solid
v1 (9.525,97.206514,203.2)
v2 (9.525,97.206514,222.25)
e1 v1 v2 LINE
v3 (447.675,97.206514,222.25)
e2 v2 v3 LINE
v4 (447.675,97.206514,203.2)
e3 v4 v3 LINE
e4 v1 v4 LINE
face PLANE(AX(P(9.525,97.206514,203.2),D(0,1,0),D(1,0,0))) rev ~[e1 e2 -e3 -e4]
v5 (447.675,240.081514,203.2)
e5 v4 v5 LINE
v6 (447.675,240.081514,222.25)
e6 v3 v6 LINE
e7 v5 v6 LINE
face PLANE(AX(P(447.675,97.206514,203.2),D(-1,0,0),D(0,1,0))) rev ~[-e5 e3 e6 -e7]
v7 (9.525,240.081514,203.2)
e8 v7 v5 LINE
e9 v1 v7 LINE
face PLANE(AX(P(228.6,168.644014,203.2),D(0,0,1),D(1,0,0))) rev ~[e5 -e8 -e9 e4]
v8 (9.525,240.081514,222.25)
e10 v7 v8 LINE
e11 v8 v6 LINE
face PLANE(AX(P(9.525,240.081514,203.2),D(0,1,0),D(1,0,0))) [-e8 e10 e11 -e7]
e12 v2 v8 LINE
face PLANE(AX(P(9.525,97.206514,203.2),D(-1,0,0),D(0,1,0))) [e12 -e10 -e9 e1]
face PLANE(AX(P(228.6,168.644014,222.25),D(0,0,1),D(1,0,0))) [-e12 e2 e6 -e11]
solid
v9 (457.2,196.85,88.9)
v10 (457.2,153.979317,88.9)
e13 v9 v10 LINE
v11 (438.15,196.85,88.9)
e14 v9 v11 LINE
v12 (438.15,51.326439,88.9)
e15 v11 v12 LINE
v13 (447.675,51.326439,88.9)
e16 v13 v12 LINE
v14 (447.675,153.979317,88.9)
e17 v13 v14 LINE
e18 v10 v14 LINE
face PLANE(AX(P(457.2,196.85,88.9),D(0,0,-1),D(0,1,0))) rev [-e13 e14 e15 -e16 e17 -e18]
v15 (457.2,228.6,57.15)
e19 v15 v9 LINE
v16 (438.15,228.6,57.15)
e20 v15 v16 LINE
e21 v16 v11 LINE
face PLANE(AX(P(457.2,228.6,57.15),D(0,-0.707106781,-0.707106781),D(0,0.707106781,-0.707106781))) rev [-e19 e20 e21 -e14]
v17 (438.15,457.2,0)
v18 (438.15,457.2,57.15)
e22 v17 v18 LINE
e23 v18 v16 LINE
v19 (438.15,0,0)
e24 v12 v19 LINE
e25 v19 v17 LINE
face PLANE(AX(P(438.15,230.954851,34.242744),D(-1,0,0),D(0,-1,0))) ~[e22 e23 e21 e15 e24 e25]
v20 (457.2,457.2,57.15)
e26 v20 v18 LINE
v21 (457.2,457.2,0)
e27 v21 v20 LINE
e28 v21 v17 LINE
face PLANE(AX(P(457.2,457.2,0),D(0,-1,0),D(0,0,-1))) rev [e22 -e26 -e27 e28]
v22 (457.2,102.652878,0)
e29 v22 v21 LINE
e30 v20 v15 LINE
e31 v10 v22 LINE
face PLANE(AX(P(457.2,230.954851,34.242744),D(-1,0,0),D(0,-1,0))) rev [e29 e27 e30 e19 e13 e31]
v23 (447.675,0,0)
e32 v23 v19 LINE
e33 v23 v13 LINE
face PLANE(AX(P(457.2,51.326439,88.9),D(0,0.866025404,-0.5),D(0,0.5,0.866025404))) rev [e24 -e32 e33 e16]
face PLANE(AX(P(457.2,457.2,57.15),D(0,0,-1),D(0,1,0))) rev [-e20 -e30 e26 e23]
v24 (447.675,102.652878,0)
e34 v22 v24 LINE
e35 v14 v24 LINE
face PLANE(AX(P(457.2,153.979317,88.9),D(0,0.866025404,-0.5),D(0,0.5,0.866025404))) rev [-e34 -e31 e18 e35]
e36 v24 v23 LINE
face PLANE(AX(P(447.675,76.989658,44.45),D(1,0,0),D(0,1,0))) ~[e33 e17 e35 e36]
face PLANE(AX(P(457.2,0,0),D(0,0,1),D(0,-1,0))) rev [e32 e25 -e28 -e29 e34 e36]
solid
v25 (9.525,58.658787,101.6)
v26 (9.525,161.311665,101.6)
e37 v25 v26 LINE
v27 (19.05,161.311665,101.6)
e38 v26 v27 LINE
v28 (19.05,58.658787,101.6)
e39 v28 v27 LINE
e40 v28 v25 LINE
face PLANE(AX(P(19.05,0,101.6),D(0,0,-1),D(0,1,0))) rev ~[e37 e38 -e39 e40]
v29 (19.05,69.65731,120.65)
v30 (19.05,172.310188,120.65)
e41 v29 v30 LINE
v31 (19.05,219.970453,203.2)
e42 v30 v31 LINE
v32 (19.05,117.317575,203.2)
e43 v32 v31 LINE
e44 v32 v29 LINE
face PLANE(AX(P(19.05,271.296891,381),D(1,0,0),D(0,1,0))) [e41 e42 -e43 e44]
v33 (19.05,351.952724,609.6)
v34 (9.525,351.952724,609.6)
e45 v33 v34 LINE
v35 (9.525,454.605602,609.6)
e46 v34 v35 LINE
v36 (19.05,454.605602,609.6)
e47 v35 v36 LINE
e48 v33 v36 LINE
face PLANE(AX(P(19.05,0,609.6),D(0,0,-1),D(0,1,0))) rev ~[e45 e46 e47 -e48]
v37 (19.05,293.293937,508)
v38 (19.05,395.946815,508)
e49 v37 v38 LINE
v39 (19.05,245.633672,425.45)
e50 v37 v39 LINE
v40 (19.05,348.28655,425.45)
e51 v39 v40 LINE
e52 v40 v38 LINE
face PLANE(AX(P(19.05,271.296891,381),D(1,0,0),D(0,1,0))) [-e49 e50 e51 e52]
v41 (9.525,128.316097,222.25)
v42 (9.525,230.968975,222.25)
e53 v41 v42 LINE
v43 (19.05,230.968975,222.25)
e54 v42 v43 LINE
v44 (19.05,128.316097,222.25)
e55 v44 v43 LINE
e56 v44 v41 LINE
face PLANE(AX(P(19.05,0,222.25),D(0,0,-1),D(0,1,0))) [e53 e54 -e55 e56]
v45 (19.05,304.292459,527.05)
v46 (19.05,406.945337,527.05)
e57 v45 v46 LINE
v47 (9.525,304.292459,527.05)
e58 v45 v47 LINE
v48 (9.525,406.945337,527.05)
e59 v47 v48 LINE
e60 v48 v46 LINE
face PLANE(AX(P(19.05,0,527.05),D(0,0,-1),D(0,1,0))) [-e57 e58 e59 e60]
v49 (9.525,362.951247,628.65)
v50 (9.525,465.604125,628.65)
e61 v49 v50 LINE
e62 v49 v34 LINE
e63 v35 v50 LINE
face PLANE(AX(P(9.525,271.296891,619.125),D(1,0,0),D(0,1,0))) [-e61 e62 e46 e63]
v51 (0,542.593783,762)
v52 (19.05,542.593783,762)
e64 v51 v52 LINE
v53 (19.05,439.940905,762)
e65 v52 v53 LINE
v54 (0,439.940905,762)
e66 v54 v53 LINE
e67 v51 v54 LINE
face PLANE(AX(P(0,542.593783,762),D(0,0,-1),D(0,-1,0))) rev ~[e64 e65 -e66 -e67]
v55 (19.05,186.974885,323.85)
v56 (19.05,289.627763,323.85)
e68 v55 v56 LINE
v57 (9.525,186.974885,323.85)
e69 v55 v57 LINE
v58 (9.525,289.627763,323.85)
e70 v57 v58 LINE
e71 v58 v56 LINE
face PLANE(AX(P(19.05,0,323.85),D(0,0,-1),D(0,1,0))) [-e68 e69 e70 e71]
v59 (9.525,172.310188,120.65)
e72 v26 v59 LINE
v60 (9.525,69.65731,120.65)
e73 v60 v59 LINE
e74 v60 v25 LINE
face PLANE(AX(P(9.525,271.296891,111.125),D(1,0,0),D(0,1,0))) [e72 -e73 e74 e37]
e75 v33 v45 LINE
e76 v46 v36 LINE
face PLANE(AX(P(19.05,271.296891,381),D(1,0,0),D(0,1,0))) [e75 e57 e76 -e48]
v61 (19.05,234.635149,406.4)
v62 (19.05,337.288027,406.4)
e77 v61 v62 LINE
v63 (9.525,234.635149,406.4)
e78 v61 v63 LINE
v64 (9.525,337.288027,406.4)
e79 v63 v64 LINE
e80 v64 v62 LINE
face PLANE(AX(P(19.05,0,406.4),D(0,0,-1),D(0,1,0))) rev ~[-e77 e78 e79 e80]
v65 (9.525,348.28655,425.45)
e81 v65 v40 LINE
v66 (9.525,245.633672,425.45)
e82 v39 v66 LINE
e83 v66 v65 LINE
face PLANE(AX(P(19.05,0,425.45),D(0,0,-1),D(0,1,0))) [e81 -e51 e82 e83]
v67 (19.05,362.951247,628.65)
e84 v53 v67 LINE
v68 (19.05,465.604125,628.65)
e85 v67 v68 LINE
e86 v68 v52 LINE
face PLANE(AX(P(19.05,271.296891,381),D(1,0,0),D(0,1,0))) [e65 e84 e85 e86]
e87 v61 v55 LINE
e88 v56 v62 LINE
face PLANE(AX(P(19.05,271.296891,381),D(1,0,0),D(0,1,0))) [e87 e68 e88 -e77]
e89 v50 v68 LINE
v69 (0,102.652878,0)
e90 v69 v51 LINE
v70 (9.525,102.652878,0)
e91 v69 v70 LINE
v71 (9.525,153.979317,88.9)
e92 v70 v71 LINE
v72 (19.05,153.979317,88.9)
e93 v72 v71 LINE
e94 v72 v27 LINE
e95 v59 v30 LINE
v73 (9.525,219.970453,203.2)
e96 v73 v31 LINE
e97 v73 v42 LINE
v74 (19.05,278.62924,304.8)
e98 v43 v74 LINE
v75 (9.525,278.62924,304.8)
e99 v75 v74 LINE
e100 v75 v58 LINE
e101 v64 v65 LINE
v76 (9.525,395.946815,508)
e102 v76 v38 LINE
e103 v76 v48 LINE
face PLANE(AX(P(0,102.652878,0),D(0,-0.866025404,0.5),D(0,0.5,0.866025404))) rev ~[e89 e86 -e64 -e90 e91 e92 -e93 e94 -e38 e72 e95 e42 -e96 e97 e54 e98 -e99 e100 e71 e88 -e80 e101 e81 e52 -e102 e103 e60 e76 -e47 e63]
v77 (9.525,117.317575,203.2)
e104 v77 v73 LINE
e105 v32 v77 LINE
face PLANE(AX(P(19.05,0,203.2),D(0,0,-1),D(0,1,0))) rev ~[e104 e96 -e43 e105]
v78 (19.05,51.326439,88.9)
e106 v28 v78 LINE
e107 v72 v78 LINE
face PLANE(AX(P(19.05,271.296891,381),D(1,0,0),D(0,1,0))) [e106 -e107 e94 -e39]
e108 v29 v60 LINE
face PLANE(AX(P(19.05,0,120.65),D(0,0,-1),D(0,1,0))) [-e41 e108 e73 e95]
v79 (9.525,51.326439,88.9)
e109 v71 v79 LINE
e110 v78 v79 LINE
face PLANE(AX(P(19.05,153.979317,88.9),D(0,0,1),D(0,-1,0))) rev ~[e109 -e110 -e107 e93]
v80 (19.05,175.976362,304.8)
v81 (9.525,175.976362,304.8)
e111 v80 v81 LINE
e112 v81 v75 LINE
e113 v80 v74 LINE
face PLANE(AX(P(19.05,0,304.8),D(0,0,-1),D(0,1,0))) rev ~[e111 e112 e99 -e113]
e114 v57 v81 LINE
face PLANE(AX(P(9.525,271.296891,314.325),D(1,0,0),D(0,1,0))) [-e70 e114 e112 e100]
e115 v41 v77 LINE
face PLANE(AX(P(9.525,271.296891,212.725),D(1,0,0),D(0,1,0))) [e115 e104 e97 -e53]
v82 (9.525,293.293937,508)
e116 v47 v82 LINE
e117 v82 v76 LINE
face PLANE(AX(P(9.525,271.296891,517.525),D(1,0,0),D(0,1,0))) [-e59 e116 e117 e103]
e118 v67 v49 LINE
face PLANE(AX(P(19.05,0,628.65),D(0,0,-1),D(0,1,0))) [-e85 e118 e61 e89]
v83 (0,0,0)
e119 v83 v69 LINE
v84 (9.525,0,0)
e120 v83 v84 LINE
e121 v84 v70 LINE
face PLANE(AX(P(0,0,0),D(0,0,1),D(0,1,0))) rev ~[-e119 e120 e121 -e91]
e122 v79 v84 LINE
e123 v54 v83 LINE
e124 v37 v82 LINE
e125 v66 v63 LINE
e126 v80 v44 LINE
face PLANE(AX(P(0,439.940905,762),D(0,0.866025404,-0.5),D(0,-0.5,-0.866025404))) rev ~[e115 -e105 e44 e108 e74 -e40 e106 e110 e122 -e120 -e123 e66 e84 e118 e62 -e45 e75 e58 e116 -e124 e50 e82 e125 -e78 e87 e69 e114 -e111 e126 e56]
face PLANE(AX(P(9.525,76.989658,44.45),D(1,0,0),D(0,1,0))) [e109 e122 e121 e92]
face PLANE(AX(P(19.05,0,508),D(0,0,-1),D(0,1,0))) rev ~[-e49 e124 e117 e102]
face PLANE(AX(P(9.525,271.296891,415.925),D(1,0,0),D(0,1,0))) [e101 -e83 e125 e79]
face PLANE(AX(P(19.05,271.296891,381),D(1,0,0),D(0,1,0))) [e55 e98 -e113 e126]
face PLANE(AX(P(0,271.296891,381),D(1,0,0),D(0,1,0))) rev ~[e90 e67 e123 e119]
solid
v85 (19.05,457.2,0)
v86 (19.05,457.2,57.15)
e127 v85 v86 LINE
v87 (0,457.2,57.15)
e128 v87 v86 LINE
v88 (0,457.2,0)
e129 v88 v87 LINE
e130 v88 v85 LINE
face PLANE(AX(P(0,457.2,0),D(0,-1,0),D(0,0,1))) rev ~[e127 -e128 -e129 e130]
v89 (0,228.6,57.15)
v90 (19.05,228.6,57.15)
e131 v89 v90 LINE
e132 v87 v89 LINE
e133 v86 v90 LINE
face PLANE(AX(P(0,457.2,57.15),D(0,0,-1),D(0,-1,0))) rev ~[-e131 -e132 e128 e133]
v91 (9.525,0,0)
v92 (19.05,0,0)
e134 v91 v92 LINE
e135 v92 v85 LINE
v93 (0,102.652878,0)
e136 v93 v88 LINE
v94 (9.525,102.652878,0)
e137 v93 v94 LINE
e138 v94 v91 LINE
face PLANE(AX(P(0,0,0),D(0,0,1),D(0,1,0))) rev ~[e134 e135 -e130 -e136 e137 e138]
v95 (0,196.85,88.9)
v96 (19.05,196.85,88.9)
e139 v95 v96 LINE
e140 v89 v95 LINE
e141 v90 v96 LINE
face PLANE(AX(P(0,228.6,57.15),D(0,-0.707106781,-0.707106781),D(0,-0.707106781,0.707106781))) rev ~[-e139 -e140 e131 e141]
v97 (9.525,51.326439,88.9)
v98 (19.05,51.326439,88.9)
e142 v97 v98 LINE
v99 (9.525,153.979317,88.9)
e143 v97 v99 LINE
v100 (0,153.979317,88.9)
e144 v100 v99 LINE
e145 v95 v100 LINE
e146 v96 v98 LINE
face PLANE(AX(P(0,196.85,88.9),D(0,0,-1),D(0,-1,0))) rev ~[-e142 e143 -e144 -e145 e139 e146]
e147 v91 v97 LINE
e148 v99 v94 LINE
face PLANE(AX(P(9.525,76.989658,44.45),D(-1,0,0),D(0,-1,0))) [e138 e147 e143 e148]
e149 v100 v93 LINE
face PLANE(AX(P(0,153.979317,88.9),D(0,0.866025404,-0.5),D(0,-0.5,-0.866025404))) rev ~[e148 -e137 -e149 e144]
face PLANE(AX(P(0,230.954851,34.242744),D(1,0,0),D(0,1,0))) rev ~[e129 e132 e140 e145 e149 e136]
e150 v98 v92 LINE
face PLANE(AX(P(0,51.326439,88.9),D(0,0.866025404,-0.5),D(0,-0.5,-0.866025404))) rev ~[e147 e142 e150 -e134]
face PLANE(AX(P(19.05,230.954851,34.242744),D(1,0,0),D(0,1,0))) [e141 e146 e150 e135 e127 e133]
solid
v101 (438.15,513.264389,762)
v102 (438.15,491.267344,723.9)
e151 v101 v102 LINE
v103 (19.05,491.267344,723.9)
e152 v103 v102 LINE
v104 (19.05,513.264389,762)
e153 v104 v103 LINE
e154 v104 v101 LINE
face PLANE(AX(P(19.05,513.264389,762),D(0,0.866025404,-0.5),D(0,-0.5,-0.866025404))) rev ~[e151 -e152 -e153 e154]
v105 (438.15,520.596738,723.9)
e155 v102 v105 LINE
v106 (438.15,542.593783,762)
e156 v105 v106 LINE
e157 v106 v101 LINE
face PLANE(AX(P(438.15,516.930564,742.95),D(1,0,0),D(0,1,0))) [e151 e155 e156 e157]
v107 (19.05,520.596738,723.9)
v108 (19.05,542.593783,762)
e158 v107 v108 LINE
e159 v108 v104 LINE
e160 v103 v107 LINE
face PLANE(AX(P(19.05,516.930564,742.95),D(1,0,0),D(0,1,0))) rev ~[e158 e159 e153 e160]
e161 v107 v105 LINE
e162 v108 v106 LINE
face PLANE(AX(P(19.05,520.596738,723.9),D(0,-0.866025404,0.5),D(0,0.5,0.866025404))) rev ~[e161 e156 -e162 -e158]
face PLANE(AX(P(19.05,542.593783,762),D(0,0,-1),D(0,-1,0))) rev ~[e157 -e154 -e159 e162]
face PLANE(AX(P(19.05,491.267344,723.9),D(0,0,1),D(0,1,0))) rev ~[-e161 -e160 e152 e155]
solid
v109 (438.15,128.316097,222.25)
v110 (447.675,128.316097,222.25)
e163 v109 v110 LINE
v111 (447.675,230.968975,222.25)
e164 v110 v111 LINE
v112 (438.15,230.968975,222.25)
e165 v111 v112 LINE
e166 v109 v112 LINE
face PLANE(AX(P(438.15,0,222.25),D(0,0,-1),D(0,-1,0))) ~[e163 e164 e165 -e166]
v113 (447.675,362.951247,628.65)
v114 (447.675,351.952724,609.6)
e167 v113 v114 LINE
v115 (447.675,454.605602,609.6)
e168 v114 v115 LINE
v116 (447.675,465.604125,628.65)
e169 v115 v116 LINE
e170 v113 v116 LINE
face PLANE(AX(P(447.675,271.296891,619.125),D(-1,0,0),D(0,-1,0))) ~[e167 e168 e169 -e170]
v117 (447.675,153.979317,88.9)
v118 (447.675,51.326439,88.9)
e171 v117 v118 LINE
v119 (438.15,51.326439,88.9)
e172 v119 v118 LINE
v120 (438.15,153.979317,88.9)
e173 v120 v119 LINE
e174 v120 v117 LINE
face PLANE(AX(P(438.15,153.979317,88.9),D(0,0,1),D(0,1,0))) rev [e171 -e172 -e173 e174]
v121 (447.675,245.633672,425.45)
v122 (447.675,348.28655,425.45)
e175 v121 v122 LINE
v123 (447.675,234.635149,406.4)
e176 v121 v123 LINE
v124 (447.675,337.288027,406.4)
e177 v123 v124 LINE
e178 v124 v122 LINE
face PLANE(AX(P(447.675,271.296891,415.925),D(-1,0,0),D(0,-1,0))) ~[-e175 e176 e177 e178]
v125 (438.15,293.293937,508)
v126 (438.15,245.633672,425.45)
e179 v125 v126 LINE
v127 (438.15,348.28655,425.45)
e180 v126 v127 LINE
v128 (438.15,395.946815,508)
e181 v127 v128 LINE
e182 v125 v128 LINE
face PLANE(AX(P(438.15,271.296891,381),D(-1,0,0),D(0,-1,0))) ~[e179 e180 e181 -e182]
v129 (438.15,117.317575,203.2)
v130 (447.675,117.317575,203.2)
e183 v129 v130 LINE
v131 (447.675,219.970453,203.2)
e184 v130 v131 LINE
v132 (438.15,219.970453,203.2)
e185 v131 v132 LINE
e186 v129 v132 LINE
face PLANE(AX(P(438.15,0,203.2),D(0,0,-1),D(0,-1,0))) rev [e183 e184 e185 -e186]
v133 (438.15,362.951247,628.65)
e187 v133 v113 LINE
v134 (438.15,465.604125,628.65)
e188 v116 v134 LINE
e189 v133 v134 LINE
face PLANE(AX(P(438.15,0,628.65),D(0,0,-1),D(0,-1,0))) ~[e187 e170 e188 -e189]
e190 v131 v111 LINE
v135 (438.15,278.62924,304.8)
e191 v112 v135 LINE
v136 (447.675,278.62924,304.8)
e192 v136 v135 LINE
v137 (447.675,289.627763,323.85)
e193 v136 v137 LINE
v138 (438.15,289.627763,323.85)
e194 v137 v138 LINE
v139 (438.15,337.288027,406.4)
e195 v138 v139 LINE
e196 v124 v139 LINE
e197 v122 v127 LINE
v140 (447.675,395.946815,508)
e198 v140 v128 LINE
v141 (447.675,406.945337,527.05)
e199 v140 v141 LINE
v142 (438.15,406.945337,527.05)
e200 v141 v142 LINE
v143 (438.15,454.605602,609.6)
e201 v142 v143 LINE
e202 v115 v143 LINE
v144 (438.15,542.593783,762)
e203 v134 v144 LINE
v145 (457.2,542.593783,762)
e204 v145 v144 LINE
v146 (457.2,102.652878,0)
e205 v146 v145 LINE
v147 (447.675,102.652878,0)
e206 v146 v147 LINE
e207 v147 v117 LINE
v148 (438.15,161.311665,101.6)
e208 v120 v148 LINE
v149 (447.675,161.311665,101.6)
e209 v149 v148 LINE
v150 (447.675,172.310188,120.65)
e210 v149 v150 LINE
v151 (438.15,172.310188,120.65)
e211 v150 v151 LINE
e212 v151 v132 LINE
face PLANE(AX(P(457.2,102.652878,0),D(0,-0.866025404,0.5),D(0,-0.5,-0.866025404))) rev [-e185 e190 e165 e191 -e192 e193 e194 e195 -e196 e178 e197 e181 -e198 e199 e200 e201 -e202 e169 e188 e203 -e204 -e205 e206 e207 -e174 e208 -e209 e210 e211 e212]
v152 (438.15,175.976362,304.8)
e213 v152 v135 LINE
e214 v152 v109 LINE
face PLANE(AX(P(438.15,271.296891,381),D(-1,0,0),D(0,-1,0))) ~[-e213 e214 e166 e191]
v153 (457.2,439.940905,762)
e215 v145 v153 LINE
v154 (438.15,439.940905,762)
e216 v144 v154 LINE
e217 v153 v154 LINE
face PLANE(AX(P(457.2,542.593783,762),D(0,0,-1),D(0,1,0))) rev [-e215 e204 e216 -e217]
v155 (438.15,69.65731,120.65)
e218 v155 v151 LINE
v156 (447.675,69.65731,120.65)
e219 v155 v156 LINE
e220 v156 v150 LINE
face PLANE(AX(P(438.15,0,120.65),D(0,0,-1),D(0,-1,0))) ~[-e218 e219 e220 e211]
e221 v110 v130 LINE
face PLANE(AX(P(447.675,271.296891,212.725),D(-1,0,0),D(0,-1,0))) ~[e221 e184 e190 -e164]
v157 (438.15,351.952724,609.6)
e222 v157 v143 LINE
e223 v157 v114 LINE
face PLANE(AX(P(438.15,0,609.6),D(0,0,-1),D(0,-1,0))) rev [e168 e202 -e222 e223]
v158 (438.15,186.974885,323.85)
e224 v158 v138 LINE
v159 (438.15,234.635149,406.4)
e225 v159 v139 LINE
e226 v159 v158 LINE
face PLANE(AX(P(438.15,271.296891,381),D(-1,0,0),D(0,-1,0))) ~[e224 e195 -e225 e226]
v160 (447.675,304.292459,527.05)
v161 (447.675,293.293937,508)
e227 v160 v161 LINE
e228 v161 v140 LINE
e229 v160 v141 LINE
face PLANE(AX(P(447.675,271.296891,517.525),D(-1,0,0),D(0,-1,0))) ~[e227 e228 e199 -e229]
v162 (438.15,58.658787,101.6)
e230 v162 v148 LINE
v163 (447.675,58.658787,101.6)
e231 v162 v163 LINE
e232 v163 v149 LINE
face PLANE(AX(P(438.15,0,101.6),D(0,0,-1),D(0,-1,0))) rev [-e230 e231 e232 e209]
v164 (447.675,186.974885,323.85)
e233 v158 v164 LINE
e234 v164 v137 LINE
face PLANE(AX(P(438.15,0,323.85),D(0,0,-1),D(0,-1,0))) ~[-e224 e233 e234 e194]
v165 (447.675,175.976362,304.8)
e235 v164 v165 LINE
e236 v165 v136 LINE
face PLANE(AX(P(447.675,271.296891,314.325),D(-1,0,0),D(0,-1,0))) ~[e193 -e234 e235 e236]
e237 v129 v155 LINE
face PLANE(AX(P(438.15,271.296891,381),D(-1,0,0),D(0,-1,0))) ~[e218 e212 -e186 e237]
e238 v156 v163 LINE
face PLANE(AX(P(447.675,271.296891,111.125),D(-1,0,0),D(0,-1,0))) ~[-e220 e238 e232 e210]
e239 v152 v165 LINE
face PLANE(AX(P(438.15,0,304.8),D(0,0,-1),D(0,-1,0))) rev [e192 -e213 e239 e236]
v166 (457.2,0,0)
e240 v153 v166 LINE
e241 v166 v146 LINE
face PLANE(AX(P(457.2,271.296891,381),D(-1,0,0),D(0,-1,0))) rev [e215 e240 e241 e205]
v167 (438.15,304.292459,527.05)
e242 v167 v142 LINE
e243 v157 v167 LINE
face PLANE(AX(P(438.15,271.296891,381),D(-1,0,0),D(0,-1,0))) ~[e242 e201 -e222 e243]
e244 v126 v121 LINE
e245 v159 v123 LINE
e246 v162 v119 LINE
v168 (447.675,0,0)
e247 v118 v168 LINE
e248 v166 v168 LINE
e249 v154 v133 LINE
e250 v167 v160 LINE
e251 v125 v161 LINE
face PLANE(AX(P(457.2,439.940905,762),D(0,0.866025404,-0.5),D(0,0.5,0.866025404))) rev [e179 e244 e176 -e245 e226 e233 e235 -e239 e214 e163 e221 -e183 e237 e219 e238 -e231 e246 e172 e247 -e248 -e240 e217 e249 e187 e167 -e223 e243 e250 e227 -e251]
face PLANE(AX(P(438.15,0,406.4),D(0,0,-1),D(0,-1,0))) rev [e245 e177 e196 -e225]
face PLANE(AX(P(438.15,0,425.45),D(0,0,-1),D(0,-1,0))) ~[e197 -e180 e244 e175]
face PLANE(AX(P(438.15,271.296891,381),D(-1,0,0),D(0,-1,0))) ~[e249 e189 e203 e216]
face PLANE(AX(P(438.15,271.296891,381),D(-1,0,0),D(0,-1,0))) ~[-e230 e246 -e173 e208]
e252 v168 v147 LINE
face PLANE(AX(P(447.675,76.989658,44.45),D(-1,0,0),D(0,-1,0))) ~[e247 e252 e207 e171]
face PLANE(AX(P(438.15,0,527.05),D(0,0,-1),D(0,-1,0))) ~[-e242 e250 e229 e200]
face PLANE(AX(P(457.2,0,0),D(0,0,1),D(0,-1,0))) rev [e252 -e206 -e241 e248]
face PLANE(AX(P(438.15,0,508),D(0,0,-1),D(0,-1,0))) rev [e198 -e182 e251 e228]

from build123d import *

# Parameters (mm, degrees)
F1_DEPTH  = 19.05
F3_DEPTH  = 9.525
F5_DEPTH  = 19.05
F7_DEPTH  = 9.525
F8_W      = 542.5937829844
F8_H      = 19.05
F9_DEPTH  = 9.525
F12_W     = 438.15
F12_H     = 142.875
F13_DEPTH = 19.05
F15_DEPTH = 419.1


# Not quite as in the source:
# - a length typed as a fraction of an inch, garbled in the dataset ("3 / 203.2 mm" for 3/8 in), is restored


with BuildPart() as f1:
    # F0 (on Right) → F1 (new body)
    with BuildSketch(Plane.YZ):
        Polygon((439.9409051225, 762), (0, 0), (102.6528778619, 0), (542.5937829844, 762), align=None)
    extrude(amount=F1_DEPTH)

    # F2 (on face) → F3 (cut)
    with BuildSketch(Plane.YZ.offset(19.05)):
        Polygon((51.326438931, 88.9), (0, 0), (102.6528778619, 0), (153.9793167929, 88.9), align=None)
    extrude(amount=-F3_DEPTH, mode=Mode.SUBTRACT)

    # F8 (on face) → F9 (cut)
    with BuildSketch(Plane.YZ.offset(19.05)):
        with Locations((271.2968914922, 111.125)):
            Rectangle(F8_W, F8_H)
        with Locations((271.2968914922, 212.725)):
            Rectangle(F8_W, F8_H)
        with Locations((271.2968914922, 314.325)):
            Rectangle(F8_W, F8_H)
        with Locations((271.2968914922, 415.925)):
            Rectangle(F8_W, F8_H)
        with Locations((271.2968914922, 517.525)):
            Rectangle(F8_W, F8_H)
        with Locations((271.2968914922, 619.125)):
            Rectangle(F8_W, F8_H)
    extrude(amount=-F9_DEPTH, mode=Mode.SUBTRACT)


with BuildPart() as f5:
    # F4 (on Right) → F5 (new body)
    with BuildSketch(Plane.YZ):
        Polygon((51.326438931, 88.9), (0, 0), (457.2, 0), (457.2, 57.15), (228.6, 57.15), (196.85, 88.9), align=None)
    extrude(amount=F5_DEPTH)

    # F6 (on face) → F7 (cut)
    with BuildSketch(Plane(origin=(0, 0, 0), x_dir=(0, -1, 0), z_dir=(-1, 0, 0))):
        Polygon((0, 0), (-51.326438931, 88.9), (-153.9793167929, 88.9), (-102.6528778619, 0), align=None)
    extrude(amount=-F7_DEPTH, mode=Mode.SUBTRACT)


with BuildPart() as f11_1:
    # F11: instance of F1
    add(f1.part.mirror(Plane.YZ.offset(228.6)))


with BuildPart() as f11_2:
    # F11: instance of F5
    add(f5.part.mirror(Plane.YZ.offset(228.6)))


with BuildPart() as f13:
    # F12 (on face) → F13 (new body)
    with BuildSketch(Plane.XY.offset(203.2)):
        with Locations((228.6, 168.6440136303)):
            Rectangle(F12_W, F12_H)
    extrude(amount=F13_DEPTH)


with BuildPart() as f15:
    # F14 (on face) → F15 (new body, through all)
    with BuildSketch(Plane.YZ.offset(19.05)):
        Polygon((520.5967377283, 723.9), (542.5937829844, 762), (513.2643893096, 762), (491.2673440535, 723.9), align=None)
    extrude(amount=F15_DEPTH)


solid = Compound([f1.part, f5.part, f11_1.part, f11_2.part, f13.part, f15.part])
